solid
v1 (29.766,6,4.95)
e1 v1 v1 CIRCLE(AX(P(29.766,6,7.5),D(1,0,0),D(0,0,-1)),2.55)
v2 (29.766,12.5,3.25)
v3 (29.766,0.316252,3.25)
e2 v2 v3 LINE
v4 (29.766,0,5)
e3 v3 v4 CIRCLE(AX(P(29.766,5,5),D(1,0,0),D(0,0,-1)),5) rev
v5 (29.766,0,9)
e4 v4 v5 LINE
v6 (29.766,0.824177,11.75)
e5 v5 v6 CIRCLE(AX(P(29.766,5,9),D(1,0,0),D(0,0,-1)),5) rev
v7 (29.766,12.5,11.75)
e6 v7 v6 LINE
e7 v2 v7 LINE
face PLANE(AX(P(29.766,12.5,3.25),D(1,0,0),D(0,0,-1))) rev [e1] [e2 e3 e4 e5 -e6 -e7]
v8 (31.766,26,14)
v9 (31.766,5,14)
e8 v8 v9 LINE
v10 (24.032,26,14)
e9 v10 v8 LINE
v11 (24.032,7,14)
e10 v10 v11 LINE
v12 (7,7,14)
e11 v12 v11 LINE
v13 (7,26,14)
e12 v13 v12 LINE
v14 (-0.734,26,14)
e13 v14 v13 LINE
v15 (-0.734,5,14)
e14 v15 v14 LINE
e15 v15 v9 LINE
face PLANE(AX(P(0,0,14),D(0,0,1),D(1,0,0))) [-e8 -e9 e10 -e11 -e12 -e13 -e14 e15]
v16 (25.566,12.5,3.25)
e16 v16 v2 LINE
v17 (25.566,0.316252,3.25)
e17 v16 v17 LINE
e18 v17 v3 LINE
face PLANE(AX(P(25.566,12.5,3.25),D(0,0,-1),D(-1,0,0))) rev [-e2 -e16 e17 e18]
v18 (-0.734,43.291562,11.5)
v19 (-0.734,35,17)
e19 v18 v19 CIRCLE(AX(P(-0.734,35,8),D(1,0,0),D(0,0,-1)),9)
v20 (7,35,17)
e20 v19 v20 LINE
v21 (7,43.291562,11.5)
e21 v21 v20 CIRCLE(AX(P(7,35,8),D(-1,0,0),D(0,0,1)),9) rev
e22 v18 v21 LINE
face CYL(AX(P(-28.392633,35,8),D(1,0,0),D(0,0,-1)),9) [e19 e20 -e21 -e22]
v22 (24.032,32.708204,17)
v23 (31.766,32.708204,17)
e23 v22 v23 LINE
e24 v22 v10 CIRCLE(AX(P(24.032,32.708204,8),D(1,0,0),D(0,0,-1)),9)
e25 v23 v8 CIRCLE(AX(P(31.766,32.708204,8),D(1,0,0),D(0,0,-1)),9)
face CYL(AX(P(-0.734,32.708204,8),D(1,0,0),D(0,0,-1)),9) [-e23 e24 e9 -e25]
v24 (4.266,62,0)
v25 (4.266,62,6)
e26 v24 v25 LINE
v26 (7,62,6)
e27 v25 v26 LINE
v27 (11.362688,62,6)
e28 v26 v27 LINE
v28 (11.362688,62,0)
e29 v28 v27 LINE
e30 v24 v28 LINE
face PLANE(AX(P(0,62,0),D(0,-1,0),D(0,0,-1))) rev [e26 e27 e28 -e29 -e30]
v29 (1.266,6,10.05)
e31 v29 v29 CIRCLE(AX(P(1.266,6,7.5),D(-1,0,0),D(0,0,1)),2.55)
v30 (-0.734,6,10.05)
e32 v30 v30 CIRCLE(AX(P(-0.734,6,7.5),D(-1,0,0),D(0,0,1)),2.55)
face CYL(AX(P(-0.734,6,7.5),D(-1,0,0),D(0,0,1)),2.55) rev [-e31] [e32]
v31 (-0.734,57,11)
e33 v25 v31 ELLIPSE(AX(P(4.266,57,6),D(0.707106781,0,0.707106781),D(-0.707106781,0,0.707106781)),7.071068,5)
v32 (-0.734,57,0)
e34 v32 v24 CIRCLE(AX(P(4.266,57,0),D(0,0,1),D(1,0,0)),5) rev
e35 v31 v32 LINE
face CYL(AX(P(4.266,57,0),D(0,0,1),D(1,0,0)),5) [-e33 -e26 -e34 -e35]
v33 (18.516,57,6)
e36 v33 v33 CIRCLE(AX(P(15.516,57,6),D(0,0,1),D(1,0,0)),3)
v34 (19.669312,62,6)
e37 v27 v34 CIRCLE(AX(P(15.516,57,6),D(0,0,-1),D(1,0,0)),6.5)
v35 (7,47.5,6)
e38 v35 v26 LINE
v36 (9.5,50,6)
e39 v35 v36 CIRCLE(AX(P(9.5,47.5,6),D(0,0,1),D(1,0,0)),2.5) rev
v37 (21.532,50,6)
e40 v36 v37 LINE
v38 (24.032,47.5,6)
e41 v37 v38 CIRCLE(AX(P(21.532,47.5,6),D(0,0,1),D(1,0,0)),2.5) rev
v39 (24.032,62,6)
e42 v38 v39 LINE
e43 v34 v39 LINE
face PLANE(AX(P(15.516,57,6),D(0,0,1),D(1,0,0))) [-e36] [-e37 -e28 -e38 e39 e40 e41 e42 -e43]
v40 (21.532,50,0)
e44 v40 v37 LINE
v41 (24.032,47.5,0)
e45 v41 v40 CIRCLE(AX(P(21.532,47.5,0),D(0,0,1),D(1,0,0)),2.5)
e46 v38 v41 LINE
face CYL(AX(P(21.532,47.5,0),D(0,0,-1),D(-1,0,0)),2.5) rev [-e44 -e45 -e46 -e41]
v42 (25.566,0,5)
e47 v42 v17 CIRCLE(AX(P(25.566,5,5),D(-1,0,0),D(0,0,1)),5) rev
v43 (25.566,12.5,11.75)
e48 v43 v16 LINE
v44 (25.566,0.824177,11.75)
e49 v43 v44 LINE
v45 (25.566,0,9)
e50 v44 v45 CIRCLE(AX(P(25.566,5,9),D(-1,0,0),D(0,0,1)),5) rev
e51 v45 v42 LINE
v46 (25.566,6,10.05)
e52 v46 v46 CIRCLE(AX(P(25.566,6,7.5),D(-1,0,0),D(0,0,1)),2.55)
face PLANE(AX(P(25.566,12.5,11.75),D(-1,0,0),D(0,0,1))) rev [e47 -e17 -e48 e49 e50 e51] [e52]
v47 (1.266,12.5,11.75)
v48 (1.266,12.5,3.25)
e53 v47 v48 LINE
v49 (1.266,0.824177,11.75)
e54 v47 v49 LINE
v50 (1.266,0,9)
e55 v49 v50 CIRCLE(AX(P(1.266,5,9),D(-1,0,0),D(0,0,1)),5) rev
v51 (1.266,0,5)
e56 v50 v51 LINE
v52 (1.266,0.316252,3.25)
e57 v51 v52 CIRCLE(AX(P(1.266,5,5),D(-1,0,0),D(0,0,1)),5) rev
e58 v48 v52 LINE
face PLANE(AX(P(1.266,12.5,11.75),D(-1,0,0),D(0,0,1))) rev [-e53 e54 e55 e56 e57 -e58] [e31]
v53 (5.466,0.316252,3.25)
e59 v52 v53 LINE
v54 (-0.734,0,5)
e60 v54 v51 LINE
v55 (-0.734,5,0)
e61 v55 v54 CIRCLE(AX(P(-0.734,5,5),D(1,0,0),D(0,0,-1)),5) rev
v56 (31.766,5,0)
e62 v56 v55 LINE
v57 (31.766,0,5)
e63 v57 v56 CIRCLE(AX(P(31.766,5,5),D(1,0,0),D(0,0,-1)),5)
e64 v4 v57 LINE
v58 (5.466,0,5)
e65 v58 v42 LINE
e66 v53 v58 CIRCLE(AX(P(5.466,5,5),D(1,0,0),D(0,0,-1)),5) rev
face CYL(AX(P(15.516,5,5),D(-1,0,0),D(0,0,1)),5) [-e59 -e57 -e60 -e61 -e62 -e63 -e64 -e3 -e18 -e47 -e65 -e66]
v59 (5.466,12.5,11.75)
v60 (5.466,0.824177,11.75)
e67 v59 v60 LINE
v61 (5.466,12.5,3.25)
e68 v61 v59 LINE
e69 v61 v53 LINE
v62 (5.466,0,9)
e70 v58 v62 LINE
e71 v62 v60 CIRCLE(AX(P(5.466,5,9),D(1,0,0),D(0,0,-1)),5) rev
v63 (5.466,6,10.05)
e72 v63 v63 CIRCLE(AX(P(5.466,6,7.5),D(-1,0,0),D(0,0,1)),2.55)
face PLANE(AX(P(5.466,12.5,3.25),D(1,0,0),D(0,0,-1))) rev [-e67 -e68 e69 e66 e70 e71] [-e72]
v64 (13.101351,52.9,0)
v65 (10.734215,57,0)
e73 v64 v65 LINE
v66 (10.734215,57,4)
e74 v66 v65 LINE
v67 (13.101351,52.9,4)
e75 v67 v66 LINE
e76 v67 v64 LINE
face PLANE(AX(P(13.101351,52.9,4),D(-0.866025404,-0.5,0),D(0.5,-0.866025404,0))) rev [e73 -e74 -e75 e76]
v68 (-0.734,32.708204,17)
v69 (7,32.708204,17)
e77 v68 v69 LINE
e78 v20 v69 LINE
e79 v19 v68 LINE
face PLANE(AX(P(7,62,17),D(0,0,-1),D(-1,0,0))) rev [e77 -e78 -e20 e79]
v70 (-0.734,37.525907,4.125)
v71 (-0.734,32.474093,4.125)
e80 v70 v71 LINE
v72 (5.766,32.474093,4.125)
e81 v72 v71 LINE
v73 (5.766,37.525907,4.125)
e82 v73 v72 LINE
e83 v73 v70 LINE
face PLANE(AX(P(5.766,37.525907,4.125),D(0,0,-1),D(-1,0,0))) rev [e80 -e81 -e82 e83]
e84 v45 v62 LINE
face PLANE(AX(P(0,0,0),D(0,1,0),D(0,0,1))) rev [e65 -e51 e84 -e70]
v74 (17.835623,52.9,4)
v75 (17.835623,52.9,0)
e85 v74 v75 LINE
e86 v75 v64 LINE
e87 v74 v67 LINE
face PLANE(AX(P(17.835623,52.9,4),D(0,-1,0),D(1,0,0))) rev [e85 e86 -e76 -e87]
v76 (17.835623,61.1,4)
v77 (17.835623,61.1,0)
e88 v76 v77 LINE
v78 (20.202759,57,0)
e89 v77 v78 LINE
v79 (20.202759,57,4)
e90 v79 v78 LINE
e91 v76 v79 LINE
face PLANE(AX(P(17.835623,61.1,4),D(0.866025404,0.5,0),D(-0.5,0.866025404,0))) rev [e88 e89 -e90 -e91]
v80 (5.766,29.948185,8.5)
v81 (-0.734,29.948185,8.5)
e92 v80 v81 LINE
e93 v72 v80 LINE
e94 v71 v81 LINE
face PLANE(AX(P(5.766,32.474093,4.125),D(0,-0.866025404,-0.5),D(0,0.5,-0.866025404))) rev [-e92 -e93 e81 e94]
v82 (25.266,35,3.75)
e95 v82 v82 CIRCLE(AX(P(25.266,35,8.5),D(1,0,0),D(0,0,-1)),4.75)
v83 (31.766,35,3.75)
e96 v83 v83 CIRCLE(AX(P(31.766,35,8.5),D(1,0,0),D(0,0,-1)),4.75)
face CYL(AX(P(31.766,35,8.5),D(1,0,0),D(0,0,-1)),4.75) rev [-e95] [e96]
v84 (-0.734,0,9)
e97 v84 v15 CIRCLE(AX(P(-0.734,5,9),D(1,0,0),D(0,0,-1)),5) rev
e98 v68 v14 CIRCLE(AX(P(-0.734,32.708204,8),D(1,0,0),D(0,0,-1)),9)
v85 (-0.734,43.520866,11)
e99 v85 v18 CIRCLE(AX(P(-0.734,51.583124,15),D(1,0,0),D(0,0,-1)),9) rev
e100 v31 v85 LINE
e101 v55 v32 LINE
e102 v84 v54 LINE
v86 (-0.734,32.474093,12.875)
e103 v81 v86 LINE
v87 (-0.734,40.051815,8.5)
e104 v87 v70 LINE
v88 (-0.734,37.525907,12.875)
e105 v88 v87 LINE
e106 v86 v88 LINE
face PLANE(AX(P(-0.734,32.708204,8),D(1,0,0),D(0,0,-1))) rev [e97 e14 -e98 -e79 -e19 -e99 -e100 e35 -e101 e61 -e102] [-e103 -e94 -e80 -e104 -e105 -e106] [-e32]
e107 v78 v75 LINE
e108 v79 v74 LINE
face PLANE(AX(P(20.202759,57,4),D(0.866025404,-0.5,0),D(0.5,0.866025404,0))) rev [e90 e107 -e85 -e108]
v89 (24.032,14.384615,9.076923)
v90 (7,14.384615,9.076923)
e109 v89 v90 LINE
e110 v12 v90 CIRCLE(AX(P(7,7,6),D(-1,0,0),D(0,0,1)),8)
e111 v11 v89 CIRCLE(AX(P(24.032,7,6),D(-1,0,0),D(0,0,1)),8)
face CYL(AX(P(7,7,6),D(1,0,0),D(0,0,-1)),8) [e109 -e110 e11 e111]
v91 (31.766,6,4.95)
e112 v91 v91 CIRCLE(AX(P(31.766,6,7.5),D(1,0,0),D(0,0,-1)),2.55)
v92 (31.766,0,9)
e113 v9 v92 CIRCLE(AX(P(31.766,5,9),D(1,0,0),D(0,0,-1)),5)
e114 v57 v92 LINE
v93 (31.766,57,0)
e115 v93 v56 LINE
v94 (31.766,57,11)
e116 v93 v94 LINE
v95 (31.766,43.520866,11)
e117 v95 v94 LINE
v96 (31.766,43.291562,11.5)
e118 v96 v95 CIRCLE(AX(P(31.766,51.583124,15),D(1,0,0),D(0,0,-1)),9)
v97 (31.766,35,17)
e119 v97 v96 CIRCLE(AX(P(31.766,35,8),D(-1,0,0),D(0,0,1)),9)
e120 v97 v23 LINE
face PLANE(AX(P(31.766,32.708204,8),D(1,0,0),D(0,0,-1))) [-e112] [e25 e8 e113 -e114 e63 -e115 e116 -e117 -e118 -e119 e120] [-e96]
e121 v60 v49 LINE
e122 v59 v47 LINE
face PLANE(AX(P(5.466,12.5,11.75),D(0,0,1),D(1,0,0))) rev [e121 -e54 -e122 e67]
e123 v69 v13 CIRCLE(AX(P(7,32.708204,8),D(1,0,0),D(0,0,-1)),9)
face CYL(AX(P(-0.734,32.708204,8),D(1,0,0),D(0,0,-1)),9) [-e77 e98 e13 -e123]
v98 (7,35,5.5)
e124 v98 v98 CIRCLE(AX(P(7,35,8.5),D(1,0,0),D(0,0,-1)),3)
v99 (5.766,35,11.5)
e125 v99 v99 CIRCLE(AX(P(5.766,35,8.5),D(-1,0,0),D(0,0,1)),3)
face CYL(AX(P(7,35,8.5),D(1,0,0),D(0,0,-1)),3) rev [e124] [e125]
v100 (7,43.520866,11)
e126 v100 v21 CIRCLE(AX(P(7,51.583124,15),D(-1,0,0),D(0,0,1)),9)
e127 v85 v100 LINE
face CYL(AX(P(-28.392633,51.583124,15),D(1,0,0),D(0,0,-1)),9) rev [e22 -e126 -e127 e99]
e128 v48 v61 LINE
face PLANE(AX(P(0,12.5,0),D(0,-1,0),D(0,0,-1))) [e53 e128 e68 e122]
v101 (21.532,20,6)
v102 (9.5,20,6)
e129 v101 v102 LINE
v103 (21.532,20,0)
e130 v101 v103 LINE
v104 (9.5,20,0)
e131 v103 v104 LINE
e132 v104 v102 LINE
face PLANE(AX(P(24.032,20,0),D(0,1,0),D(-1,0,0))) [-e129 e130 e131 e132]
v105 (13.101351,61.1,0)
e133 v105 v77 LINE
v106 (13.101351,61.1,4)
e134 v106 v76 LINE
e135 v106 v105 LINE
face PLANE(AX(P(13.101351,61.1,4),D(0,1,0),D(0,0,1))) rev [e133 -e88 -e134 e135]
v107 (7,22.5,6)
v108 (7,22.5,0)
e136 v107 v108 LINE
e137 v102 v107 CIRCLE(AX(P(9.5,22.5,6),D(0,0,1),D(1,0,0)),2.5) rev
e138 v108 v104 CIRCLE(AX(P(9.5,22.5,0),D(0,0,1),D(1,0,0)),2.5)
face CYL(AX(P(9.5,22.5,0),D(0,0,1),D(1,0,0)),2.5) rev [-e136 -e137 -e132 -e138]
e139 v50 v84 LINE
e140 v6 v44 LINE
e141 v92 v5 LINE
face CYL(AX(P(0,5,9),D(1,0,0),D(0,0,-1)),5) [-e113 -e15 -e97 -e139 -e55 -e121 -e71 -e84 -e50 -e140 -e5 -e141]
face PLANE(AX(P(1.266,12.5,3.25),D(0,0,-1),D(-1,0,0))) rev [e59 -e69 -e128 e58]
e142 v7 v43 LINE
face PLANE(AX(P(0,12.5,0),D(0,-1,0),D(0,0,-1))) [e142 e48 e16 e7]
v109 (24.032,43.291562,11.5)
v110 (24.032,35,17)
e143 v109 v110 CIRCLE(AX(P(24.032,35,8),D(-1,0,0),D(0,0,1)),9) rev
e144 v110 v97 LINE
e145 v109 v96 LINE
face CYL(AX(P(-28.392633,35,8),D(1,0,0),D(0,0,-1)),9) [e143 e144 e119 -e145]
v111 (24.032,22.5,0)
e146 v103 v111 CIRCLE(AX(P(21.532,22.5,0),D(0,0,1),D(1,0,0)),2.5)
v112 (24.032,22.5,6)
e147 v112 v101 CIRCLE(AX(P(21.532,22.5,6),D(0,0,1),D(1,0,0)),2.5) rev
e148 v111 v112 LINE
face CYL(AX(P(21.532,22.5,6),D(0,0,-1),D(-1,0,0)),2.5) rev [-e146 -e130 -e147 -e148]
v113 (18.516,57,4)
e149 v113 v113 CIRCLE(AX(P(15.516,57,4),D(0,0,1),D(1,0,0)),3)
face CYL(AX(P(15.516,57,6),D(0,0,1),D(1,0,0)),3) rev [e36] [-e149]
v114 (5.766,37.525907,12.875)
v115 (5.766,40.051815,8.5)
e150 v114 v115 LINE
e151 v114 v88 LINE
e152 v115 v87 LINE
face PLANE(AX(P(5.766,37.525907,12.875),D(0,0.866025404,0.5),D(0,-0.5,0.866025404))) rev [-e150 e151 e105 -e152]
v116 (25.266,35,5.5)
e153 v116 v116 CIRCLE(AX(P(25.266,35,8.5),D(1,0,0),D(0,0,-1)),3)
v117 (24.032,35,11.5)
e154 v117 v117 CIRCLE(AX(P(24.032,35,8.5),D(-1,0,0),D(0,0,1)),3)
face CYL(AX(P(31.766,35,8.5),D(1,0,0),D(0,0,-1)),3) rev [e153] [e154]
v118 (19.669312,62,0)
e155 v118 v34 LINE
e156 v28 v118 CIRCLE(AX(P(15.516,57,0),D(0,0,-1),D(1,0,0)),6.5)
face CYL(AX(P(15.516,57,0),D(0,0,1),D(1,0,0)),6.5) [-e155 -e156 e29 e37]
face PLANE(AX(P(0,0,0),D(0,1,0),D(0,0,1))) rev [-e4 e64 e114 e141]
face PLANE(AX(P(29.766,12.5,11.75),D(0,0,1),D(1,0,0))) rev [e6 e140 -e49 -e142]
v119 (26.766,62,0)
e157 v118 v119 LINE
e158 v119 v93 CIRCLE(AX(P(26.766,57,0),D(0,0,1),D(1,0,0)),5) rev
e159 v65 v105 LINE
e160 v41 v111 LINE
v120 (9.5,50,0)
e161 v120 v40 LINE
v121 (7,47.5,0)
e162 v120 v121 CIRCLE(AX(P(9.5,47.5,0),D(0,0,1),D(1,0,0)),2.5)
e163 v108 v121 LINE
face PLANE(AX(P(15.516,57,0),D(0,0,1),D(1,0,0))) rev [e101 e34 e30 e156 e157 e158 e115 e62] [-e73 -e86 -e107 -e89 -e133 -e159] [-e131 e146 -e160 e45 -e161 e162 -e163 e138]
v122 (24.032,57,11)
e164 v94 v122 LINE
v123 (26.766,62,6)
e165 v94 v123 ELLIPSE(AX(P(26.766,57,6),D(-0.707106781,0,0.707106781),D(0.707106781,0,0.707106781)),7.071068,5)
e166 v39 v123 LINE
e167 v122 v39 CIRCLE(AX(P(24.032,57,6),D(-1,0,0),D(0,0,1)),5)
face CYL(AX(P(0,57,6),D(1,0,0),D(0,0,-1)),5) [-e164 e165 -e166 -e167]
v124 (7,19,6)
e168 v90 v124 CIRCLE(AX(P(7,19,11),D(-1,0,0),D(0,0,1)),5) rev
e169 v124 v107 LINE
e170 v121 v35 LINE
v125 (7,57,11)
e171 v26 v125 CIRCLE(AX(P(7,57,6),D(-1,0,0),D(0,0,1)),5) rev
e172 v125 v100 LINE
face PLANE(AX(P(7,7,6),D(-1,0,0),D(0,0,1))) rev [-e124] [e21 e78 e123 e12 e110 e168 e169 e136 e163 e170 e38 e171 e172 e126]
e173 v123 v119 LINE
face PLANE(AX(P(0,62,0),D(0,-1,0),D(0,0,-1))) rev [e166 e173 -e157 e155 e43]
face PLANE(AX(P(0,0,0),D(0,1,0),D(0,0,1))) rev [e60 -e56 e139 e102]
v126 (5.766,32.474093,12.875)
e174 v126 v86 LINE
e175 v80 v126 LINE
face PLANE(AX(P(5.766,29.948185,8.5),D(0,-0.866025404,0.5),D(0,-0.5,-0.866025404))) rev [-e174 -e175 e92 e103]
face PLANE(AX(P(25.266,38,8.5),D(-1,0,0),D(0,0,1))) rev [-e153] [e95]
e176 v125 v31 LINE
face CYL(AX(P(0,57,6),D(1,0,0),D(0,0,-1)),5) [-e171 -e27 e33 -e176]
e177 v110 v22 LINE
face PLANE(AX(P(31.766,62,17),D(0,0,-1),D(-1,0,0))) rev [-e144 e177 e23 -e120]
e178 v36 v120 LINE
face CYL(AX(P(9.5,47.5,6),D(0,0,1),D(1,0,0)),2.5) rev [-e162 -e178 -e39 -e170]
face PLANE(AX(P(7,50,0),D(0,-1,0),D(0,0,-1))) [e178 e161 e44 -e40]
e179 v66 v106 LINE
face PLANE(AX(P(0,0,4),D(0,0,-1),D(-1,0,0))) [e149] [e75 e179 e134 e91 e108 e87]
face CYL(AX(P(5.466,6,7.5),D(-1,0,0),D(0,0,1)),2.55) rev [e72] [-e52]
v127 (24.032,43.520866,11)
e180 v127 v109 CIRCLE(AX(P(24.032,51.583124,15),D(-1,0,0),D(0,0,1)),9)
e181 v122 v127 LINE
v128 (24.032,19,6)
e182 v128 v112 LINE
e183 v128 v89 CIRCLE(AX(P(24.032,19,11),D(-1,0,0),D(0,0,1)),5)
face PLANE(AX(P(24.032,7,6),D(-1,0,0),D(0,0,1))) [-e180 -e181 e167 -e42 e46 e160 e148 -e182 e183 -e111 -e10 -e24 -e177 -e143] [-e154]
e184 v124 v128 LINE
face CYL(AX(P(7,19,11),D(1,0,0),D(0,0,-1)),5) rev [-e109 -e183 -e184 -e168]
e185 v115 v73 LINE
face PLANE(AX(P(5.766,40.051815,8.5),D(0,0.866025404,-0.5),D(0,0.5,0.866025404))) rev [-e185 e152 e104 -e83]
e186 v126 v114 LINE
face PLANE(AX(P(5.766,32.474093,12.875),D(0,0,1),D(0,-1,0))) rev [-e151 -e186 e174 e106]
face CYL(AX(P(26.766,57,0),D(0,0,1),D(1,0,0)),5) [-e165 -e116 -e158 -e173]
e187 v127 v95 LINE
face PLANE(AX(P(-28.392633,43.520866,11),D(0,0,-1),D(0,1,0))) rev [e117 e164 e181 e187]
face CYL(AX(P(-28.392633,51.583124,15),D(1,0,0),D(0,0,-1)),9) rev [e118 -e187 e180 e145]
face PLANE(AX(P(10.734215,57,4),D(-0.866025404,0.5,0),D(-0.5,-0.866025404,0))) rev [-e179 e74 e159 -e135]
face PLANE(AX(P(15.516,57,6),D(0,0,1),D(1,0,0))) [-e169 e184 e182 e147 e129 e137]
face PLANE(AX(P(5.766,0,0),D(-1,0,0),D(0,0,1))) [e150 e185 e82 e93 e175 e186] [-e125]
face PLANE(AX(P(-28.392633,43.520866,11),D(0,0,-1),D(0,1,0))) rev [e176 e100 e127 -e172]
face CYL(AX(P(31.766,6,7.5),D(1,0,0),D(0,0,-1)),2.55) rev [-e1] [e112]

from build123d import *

# Parameters (mm, degrees)
BOSS_EXTRUDE1_DEPTH            = 32.5
SKETCH2_W                      = 32.5
SKETCH2_H                      = 25.708203932
BOSS_EXTRUDE2_DEPTH            = 8
CUT_EXTRUDE1_DEPTH             = 17.032
SKETCH4_W                      = 32.5
SKETCH4_H                      = 8
BOSS_EXTRUDE3_DEPTH            = 7
SKETCH5_W                      = 7.734
SKETCH5_H                      = 11
BOSS_EXTRUDE4_DEPTH            = 29.291796068
SKETCH6_W                      = 7.734
SKETCH6_H                      = 11
BOSS_EXTRUDE5_DEPTH            = 29.291796068
SKETCH7_W                      = 17.032
SKETCH7_H                      = 30
BOSS_EXTRUDE6_DEPTH            = 6
CUT_EXTRUDE3_REACH             = 75.331
CUT_EXTRUDE4_DEPTH             = 6.5
CUT_EXTRUDE5_DEPTH             = 4
SKETCH12_W                     = 4.2
SKETCH12_H                     = 8.5
CUT_EXTRUDE6_DEPTH             = 12.5
SKETCH13_W                     = 4.2
SKETCH13_H                     = 8.5
CUT_EXTRUDE7_DEPTH             = 12.5
F_5_1_5_1_DIAMETER_HOLE1_D     = 5.1
F_5_1_5_1_DIAMETER_HOLE1_DEPTH = 2
F_5_1_5_1_DIAMETER_HOLE2_D     = 5.1
F_5_1_5_1_DIAMETER_HOLE2_DEPTH = 2
F_6_0_6_DIAMETER_HOLE1_D       = 6
F_6_0_6_DIAMETER_HOLE1_DEPTH   = 7.73405
HOLE1_D                        = 6
HOLE1_DEPTH                    = 32.50005
HOLE1_CBORE_D                  = 9.5
HOLE1_CBORE_DEPTH              = 6.5
F_6_0_6_DIAMETER_HOLE2_D       = 6
F_5_1_5_1_DIAMETER_HOLE3_D     = 5.1
F_5_1_5_1_DIAMETER_HOLE3_DEPTH = 26.30005
FILLET1_R                      = 2.5
FILLET2_R                      = 5


with BuildPart() as part:
    # Sketch1 → Boss-Extrude1 (new body)
    with BuildSketch(Plane(origin=(31.766, 0, 0), x_dir=(0, 0, -1), z_dir=(1, 0, 0))):
        with BuildLine():
            Line((-14, 26), (-14, 32.708203932))
            Line((-14, 32.708203932), (-17, 32.708203932))
            ThreePointArc((-17, 32.708203932), (-16.215838363, 29.033969318), (-14, 26))
        make_face()
    extrude(amount=-BOSS_EXTRUDE1_DEPTH)

    # Sketch2 → Boss-Extrude2 (add)
    with BuildSketch(Plane(origin=(0, 0, 14), x_dir=(-1, 0, 0), z_dir=(0, 0, -1))):
        with Locations((-15.516, 19.854101966)):
            Rectangle(SKETCH2_W, SKETCH2_H)
    extrude(amount=BOSS_EXTRUDE2_DEPTH)

    # Sketch3 → Cut-Extrude1 (cut)
    with BuildSketch(Plane(origin=(24.032, 0, 0), x_dir=(0, 0, -1), z_dir=(1, 0, 0))):
        with BuildLine():
            Line((-6, 15), (-6, 32.708203932))
            Line((-6, 32.708203932), (-17, 32.708203932))
            ThreePointArc((-17, 32.708203932), (-16.215838363, 29.033969318), (-14, 26))
            Line((-14, 26), (-14, 7))
            ThreePointArc((-14, 7), (-11.656854249, 12.656854249), (-6, 15))
        make_face()
    extrude(amount=-CUT_EXTRUDE1_DEPTH, mode=Mode.SUBTRACT)

    # Sketch4 → Boss-Extrude3 (add)
    with BuildSketch(Plane.XZ.offset(-7)):
        with Locations((15.516, 10)):
            Rectangle(SKETCH4_W, SKETCH4_H)
    extrude(amount=BOSS_EXTRUDE3_DEPTH)

    # Sketch5 → Boss-Extrude4 (add)
    with BuildSketch(Plane(origin=(0, 32.708203932, 0), x_dir=(-1, 0, 0), z_dir=(0, 1, 0))):
        with Locations((-27.899, 11.5)):
            Rectangle(SKETCH5_W, SKETCH5_H)
    extrude(amount=BOSS_EXTRUDE4_DEPTH)

    # Sketch6 → Boss-Extrude5 (add)
    with BuildSketch(Plane(origin=(0, 32.708203932, 0), x_dir=(-1, 0, 0), z_dir=(0, 1, 0))):
        with Locations((-3.133, 11.5)):
            Rectangle(SKETCH6_W, SKETCH6_H)
    extrude(amount=BOSS_EXTRUDE5_DEPTH)

    # Sketch7 → Boss-Extrude6 (add)
    with BuildSketch(Plane(origin=(0, 0, 6), x_dir=(-1, 0, 0), z_dir=(0, 0, -1))):
        with BuildLine():
            Line((0.734, 62), (0.734, 0))
            Line((0.734, 0), (-31.766, 0))
            Line((-31.766, 0), (-31.766, 62))
            Line((-31.766, 62), (-19.669311931, 62))
            ThreePointArc((-19.669311931, 62), (-15.516, 63.5), (-11.362688069, 62))
            Line((-11.362688069, 62), (0.734, 62))
        make_face()
        with Locations((-15.516, 35)):
            Rectangle(SKETCH7_W, SKETCH7_H, mode=Mode.SUBTRACT)
    extrude(amount=BOSS_EXTRUDE6_DEPTH)

    # Cut-Extrude3: up to this face of the body (flat: up to its plane)
    cut_extrude3_end = Plane(part.part.faces().sort_by_distance((-0.734, 32.469284898, 7.888317221))[0])
    # Sketch9 → Cut-Extrude3 (cut, up to the picked face)
    with BuildSketch(Plane(origin=(31.766, 0, 0), x_dir=(0, 0, -1), z_dir=(1, 0, 0)), mode=Mode.PRIVATE) as cut_extrude3_sk1:
        with BuildLine():
            Line((-11, 43.520866203), (-11, 62))
            Line((-11, 62), (-17, 62))
            Line((-17, 62), (-17, 35))
            ThreePointArc((-17, 35), (-15.5, 39.974937186), (-11.5, 43.291561976))
            ThreePointArc((-11.5, 43.291561976), (-11.248247728, 43.402393245), (-11, 43.520866203))
        make_face()
    cut_extrude3_tool1 = split(extrude(cut_extrude3_sk1.sketch, amount=-CUT_EXTRUDE3_REACH, mode=Mode.PRIVATE), bisect_by=cut_extrude3_end, keep=Keep.BOTH, mode=Mode.PRIVATE)
    add(cut_extrude3_tool1.solids().sort_by(Axis((31.766, 51.50501, 14.153169), (-1, 0, 0)))[0], mode=Mode.SUBTRACT)

    # Sketch10 → Cut-Extrude4 (cut)
    with BuildSketch(Plane.ZY.offset(0.734)):
        Polygon((8.5, 40.051814855), (4.125, 37.525907428), (4.125, 32.474092572), (8.5, 29.948185145), (12.875, 32.474092572), (12.875, 37.525907428), align=None)
    extrude(amount=-CUT_EXTRUDE4_DEPTH, mode=Mode.SUBTRACT)

    # Sketch11 → Cut-Extrude5 (cut)
    with BuildSketch(Plane(origin=(0, 0, 0), x_dir=(-1, 0, 0), z_dir=(0, 0, -1))):
        Polygon((-17.835622857, 61.1), (-20.202758961, 57), (-17.835622857, 52.9), (-13.10135065, 52.9), (-10.734214546, 57), (-13.10135065, 61.1), align=None)
    extrude(amount=-CUT_EXTRUDE5_DEPTH, mode=Mode.SUBTRACT)

    # Sketch12 → Cut-Extrude6 (cut)
    with BuildSketch(Plane.XZ):
        with Locations((27.666, 7.5)):
            Rectangle(SKETCH12_W, SKETCH12_H)
    extrude(amount=-CUT_EXTRUDE6_DEPTH, mode=Mode.SUBTRACT)

    # Sketch13 → Cut-Extrude7 (cut)
    with BuildSketch(Plane.XZ):
        with Locations((3.366, 7.5)):
            Rectangle(SKETCH13_W, SKETCH13_H)
    extrude(amount=-CUT_EXTRUDE7_DEPTH, mode=Mode.SUBTRACT)

    # Ø5.1 (5.1) Diameter Hole1
    with Locations(Plane(origin=(31.766, 0, 0), x_dir=(0, 0, -1), z_dir=(1, 0, 0))):
        with Locations((-7.5, 6)):
            Hole(F_5_1_5_1_DIAMETER_HOLE1_D / 2, depth=F_5_1_5_1_DIAMETER_HOLE1_DEPTH)

    # Ø5.1 (5.1) Diameter Hole2
    with Locations(Plane.ZY.offset(0.734)):
        with Locations((7.5, 6)):
            Hole(F_5_1_5_1_DIAMETER_HOLE2_D / 2, depth=F_5_1_5_1_DIAMETER_HOLE2_DEPTH)

    # Ø6.0 (6) Diameter Hole1
    with Locations(Plane(origin=(7, 0, 0), x_dir=(0, 0, -1), z_dir=(1, 0, 0))):
        with Locations((-8.5, 35)):
            Hole(F_6_0_6_DIAMETER_HOLE1_D / 2, depth=F_6_0_6_DIAMETER_HOLE1_DEPTH)

    # Hole1
    with Locations(Plane(origin=(31.766, 0, 0), x_dir=(0, 0, -1), z_dir=(1, 0, 0))):
        with Locations((-8.5, 35)):
            CounterBoreHole(HOLE1_D / 2, HOLE1_CBORE_D / 2, HOLE1_CBORE_DEPTH, depth=HOLE1_DEPTH)

    # Ø6.0 (6) Diameter Hole2 (through all)
    with Locations(Plane.XY.offset(6)):
        with Locations((15.516, 57)):
            Hole(F_6_0_6_DIAMETER_HOLE2_D / 2)

    # Ø5.1 (5.1) Diameter Hole3
    with Locations(Plane.ZY.offset(-5.466)):
        with Locations((7.5, 6)):
            Hole(F_5_1_5_1_DIAMETER_HOLE3_D / 2, depth=F_5_1_5_1_DIAMETER_HOLE3_DEPTH)

    # Fillet1
    fillet1_edges = [part.edges().sort_by_distance(p)[0] for p in [
        (7, 20, 3),
        (24.032, 20, 3),
        (7, 50, 3),
        (24.032, 50, 3),
    ]]
    fillet(fillet1_edges, radius=FILLET1_R)

    # Fillet2
    # the kernel refuses this fillet: 5 mm, written as the material it adds along each edge
    with BuildSketch(Plane(origin=(34.032, 15, 6), x_dir=(0, 1, 0), z_dir=(-1, 0, 0))) as fillet2_piece_1_section:
        with BuildLine():
            CenterArc((4, -5), FILLET2_R, 90, 67.380135052)
            ThreePointArc((-0.615384615, -3.076923077), (-0.155354594, -1.568929081), (0, 0))
            Line((0, 0), (4, 0))
        make_face()
    fillet2_piece_1 = extrude(amount=27.032, mode=Mode.PRIVATE)
    fillet2_piece_1 = split(fillet2_piece_1, bisect_by=Plane(origin=(31.766, 15.849865024, 6.687390225), z_dir=(-1, 0, 0)), keep=Keep.TOP, mode=Mode.PRIVATE)
    add(fillet2_piece_1)
    # the kernel refuses this fillet: 5 mm, written as the material it takes off along each edge
    with BuildSketch(Plane(origin=(-0.734, 62, 23.5), x_dir=(1, 0, 0), z_dir=(0, 0, -1)), Plane(origin=(31.766, 62, -12.5), x_dir=(-1, 0, 0), z_dir=(0, 0, 1))) as fillet2_2_piece_1:
        with BuildLine():
            CenterArc((FILLET2_R, FILLET2_R), FILLET2_R, 180, 90)
            Line((0, FILLET2_R), (0, 0))
            Line((0, 0), (FILLET2_R, 0))
        make_face()
    extrude(amount=36, mode=Mode.SUBTRACT)
    with BuildSketch(Plane(origin=(-13.234, 0, 0), x_dir=(0, 1, 0), z_dir=(1, 0, 0))) as fillet2_2_piece_2:
        with BuildLine():
            CenterArc((FILLET2_R, FILLET2_R), FILLET2_R, 180, 90)
            Line((0, FILLET2_R), (0, 0))
            Line((0, 0), (FILLET2_R, 0))
        make_face()
    extrude(amount=57.5, mode=Mode.SUBTRACT)
    with BuildSketch(Plane(origin=(44.266, 62, 11), x_dir=(0, -1, 0), z_dir=(-1, 0, 0))) as fillet2_2_piece_3:
        with BuildLine():
            CenterArc((FILLET2_R, -FILLET2_R), FILLET2_R, 90, 90)
            Line((0, -FILLET2_R), (0, 0))
            Line((0, 0), (FILLET2_R, 0))
        make_face()
    extrude(amount=32.734, mode=Mode.SUBTRACT)
    with BuildSketch(Plane(origin=(-13.234, 0, 14), x_dir=(0, 1, 0), z_dir=(1, 0, 0))) as fillet2_2_piece_4:
        with BuildLine():
            CenterArc((FILLET2_R, -FILLET2_R), FILLET2_R, 90, 90)
            Line((0, -FILLET2_R), (0, 0))
            Line((0, 0), (FILLET2_R, 0))
        make_face()
    extrude(amount=57.5, mode=Mode.SUBTRACT)
    with BuildSketch(Plane(origin=(19.5, 62, 11), x_dir=(0, 0, -1), z_dir=(-1, 0, 0))) as fillet2_2_piece_5:
        with BuildLine():
            CenterArc((FILLET2_R, FILLET2_R), FILLET2_R, 180, 90)
            Line((0, FILLET2_R), (0, 0))
            Line((0, 0), (FILLET2_R, 0))
        make_face()
    extrude(amount=32.734, mode=Mode.SUBTRACT)


solid = part.part
